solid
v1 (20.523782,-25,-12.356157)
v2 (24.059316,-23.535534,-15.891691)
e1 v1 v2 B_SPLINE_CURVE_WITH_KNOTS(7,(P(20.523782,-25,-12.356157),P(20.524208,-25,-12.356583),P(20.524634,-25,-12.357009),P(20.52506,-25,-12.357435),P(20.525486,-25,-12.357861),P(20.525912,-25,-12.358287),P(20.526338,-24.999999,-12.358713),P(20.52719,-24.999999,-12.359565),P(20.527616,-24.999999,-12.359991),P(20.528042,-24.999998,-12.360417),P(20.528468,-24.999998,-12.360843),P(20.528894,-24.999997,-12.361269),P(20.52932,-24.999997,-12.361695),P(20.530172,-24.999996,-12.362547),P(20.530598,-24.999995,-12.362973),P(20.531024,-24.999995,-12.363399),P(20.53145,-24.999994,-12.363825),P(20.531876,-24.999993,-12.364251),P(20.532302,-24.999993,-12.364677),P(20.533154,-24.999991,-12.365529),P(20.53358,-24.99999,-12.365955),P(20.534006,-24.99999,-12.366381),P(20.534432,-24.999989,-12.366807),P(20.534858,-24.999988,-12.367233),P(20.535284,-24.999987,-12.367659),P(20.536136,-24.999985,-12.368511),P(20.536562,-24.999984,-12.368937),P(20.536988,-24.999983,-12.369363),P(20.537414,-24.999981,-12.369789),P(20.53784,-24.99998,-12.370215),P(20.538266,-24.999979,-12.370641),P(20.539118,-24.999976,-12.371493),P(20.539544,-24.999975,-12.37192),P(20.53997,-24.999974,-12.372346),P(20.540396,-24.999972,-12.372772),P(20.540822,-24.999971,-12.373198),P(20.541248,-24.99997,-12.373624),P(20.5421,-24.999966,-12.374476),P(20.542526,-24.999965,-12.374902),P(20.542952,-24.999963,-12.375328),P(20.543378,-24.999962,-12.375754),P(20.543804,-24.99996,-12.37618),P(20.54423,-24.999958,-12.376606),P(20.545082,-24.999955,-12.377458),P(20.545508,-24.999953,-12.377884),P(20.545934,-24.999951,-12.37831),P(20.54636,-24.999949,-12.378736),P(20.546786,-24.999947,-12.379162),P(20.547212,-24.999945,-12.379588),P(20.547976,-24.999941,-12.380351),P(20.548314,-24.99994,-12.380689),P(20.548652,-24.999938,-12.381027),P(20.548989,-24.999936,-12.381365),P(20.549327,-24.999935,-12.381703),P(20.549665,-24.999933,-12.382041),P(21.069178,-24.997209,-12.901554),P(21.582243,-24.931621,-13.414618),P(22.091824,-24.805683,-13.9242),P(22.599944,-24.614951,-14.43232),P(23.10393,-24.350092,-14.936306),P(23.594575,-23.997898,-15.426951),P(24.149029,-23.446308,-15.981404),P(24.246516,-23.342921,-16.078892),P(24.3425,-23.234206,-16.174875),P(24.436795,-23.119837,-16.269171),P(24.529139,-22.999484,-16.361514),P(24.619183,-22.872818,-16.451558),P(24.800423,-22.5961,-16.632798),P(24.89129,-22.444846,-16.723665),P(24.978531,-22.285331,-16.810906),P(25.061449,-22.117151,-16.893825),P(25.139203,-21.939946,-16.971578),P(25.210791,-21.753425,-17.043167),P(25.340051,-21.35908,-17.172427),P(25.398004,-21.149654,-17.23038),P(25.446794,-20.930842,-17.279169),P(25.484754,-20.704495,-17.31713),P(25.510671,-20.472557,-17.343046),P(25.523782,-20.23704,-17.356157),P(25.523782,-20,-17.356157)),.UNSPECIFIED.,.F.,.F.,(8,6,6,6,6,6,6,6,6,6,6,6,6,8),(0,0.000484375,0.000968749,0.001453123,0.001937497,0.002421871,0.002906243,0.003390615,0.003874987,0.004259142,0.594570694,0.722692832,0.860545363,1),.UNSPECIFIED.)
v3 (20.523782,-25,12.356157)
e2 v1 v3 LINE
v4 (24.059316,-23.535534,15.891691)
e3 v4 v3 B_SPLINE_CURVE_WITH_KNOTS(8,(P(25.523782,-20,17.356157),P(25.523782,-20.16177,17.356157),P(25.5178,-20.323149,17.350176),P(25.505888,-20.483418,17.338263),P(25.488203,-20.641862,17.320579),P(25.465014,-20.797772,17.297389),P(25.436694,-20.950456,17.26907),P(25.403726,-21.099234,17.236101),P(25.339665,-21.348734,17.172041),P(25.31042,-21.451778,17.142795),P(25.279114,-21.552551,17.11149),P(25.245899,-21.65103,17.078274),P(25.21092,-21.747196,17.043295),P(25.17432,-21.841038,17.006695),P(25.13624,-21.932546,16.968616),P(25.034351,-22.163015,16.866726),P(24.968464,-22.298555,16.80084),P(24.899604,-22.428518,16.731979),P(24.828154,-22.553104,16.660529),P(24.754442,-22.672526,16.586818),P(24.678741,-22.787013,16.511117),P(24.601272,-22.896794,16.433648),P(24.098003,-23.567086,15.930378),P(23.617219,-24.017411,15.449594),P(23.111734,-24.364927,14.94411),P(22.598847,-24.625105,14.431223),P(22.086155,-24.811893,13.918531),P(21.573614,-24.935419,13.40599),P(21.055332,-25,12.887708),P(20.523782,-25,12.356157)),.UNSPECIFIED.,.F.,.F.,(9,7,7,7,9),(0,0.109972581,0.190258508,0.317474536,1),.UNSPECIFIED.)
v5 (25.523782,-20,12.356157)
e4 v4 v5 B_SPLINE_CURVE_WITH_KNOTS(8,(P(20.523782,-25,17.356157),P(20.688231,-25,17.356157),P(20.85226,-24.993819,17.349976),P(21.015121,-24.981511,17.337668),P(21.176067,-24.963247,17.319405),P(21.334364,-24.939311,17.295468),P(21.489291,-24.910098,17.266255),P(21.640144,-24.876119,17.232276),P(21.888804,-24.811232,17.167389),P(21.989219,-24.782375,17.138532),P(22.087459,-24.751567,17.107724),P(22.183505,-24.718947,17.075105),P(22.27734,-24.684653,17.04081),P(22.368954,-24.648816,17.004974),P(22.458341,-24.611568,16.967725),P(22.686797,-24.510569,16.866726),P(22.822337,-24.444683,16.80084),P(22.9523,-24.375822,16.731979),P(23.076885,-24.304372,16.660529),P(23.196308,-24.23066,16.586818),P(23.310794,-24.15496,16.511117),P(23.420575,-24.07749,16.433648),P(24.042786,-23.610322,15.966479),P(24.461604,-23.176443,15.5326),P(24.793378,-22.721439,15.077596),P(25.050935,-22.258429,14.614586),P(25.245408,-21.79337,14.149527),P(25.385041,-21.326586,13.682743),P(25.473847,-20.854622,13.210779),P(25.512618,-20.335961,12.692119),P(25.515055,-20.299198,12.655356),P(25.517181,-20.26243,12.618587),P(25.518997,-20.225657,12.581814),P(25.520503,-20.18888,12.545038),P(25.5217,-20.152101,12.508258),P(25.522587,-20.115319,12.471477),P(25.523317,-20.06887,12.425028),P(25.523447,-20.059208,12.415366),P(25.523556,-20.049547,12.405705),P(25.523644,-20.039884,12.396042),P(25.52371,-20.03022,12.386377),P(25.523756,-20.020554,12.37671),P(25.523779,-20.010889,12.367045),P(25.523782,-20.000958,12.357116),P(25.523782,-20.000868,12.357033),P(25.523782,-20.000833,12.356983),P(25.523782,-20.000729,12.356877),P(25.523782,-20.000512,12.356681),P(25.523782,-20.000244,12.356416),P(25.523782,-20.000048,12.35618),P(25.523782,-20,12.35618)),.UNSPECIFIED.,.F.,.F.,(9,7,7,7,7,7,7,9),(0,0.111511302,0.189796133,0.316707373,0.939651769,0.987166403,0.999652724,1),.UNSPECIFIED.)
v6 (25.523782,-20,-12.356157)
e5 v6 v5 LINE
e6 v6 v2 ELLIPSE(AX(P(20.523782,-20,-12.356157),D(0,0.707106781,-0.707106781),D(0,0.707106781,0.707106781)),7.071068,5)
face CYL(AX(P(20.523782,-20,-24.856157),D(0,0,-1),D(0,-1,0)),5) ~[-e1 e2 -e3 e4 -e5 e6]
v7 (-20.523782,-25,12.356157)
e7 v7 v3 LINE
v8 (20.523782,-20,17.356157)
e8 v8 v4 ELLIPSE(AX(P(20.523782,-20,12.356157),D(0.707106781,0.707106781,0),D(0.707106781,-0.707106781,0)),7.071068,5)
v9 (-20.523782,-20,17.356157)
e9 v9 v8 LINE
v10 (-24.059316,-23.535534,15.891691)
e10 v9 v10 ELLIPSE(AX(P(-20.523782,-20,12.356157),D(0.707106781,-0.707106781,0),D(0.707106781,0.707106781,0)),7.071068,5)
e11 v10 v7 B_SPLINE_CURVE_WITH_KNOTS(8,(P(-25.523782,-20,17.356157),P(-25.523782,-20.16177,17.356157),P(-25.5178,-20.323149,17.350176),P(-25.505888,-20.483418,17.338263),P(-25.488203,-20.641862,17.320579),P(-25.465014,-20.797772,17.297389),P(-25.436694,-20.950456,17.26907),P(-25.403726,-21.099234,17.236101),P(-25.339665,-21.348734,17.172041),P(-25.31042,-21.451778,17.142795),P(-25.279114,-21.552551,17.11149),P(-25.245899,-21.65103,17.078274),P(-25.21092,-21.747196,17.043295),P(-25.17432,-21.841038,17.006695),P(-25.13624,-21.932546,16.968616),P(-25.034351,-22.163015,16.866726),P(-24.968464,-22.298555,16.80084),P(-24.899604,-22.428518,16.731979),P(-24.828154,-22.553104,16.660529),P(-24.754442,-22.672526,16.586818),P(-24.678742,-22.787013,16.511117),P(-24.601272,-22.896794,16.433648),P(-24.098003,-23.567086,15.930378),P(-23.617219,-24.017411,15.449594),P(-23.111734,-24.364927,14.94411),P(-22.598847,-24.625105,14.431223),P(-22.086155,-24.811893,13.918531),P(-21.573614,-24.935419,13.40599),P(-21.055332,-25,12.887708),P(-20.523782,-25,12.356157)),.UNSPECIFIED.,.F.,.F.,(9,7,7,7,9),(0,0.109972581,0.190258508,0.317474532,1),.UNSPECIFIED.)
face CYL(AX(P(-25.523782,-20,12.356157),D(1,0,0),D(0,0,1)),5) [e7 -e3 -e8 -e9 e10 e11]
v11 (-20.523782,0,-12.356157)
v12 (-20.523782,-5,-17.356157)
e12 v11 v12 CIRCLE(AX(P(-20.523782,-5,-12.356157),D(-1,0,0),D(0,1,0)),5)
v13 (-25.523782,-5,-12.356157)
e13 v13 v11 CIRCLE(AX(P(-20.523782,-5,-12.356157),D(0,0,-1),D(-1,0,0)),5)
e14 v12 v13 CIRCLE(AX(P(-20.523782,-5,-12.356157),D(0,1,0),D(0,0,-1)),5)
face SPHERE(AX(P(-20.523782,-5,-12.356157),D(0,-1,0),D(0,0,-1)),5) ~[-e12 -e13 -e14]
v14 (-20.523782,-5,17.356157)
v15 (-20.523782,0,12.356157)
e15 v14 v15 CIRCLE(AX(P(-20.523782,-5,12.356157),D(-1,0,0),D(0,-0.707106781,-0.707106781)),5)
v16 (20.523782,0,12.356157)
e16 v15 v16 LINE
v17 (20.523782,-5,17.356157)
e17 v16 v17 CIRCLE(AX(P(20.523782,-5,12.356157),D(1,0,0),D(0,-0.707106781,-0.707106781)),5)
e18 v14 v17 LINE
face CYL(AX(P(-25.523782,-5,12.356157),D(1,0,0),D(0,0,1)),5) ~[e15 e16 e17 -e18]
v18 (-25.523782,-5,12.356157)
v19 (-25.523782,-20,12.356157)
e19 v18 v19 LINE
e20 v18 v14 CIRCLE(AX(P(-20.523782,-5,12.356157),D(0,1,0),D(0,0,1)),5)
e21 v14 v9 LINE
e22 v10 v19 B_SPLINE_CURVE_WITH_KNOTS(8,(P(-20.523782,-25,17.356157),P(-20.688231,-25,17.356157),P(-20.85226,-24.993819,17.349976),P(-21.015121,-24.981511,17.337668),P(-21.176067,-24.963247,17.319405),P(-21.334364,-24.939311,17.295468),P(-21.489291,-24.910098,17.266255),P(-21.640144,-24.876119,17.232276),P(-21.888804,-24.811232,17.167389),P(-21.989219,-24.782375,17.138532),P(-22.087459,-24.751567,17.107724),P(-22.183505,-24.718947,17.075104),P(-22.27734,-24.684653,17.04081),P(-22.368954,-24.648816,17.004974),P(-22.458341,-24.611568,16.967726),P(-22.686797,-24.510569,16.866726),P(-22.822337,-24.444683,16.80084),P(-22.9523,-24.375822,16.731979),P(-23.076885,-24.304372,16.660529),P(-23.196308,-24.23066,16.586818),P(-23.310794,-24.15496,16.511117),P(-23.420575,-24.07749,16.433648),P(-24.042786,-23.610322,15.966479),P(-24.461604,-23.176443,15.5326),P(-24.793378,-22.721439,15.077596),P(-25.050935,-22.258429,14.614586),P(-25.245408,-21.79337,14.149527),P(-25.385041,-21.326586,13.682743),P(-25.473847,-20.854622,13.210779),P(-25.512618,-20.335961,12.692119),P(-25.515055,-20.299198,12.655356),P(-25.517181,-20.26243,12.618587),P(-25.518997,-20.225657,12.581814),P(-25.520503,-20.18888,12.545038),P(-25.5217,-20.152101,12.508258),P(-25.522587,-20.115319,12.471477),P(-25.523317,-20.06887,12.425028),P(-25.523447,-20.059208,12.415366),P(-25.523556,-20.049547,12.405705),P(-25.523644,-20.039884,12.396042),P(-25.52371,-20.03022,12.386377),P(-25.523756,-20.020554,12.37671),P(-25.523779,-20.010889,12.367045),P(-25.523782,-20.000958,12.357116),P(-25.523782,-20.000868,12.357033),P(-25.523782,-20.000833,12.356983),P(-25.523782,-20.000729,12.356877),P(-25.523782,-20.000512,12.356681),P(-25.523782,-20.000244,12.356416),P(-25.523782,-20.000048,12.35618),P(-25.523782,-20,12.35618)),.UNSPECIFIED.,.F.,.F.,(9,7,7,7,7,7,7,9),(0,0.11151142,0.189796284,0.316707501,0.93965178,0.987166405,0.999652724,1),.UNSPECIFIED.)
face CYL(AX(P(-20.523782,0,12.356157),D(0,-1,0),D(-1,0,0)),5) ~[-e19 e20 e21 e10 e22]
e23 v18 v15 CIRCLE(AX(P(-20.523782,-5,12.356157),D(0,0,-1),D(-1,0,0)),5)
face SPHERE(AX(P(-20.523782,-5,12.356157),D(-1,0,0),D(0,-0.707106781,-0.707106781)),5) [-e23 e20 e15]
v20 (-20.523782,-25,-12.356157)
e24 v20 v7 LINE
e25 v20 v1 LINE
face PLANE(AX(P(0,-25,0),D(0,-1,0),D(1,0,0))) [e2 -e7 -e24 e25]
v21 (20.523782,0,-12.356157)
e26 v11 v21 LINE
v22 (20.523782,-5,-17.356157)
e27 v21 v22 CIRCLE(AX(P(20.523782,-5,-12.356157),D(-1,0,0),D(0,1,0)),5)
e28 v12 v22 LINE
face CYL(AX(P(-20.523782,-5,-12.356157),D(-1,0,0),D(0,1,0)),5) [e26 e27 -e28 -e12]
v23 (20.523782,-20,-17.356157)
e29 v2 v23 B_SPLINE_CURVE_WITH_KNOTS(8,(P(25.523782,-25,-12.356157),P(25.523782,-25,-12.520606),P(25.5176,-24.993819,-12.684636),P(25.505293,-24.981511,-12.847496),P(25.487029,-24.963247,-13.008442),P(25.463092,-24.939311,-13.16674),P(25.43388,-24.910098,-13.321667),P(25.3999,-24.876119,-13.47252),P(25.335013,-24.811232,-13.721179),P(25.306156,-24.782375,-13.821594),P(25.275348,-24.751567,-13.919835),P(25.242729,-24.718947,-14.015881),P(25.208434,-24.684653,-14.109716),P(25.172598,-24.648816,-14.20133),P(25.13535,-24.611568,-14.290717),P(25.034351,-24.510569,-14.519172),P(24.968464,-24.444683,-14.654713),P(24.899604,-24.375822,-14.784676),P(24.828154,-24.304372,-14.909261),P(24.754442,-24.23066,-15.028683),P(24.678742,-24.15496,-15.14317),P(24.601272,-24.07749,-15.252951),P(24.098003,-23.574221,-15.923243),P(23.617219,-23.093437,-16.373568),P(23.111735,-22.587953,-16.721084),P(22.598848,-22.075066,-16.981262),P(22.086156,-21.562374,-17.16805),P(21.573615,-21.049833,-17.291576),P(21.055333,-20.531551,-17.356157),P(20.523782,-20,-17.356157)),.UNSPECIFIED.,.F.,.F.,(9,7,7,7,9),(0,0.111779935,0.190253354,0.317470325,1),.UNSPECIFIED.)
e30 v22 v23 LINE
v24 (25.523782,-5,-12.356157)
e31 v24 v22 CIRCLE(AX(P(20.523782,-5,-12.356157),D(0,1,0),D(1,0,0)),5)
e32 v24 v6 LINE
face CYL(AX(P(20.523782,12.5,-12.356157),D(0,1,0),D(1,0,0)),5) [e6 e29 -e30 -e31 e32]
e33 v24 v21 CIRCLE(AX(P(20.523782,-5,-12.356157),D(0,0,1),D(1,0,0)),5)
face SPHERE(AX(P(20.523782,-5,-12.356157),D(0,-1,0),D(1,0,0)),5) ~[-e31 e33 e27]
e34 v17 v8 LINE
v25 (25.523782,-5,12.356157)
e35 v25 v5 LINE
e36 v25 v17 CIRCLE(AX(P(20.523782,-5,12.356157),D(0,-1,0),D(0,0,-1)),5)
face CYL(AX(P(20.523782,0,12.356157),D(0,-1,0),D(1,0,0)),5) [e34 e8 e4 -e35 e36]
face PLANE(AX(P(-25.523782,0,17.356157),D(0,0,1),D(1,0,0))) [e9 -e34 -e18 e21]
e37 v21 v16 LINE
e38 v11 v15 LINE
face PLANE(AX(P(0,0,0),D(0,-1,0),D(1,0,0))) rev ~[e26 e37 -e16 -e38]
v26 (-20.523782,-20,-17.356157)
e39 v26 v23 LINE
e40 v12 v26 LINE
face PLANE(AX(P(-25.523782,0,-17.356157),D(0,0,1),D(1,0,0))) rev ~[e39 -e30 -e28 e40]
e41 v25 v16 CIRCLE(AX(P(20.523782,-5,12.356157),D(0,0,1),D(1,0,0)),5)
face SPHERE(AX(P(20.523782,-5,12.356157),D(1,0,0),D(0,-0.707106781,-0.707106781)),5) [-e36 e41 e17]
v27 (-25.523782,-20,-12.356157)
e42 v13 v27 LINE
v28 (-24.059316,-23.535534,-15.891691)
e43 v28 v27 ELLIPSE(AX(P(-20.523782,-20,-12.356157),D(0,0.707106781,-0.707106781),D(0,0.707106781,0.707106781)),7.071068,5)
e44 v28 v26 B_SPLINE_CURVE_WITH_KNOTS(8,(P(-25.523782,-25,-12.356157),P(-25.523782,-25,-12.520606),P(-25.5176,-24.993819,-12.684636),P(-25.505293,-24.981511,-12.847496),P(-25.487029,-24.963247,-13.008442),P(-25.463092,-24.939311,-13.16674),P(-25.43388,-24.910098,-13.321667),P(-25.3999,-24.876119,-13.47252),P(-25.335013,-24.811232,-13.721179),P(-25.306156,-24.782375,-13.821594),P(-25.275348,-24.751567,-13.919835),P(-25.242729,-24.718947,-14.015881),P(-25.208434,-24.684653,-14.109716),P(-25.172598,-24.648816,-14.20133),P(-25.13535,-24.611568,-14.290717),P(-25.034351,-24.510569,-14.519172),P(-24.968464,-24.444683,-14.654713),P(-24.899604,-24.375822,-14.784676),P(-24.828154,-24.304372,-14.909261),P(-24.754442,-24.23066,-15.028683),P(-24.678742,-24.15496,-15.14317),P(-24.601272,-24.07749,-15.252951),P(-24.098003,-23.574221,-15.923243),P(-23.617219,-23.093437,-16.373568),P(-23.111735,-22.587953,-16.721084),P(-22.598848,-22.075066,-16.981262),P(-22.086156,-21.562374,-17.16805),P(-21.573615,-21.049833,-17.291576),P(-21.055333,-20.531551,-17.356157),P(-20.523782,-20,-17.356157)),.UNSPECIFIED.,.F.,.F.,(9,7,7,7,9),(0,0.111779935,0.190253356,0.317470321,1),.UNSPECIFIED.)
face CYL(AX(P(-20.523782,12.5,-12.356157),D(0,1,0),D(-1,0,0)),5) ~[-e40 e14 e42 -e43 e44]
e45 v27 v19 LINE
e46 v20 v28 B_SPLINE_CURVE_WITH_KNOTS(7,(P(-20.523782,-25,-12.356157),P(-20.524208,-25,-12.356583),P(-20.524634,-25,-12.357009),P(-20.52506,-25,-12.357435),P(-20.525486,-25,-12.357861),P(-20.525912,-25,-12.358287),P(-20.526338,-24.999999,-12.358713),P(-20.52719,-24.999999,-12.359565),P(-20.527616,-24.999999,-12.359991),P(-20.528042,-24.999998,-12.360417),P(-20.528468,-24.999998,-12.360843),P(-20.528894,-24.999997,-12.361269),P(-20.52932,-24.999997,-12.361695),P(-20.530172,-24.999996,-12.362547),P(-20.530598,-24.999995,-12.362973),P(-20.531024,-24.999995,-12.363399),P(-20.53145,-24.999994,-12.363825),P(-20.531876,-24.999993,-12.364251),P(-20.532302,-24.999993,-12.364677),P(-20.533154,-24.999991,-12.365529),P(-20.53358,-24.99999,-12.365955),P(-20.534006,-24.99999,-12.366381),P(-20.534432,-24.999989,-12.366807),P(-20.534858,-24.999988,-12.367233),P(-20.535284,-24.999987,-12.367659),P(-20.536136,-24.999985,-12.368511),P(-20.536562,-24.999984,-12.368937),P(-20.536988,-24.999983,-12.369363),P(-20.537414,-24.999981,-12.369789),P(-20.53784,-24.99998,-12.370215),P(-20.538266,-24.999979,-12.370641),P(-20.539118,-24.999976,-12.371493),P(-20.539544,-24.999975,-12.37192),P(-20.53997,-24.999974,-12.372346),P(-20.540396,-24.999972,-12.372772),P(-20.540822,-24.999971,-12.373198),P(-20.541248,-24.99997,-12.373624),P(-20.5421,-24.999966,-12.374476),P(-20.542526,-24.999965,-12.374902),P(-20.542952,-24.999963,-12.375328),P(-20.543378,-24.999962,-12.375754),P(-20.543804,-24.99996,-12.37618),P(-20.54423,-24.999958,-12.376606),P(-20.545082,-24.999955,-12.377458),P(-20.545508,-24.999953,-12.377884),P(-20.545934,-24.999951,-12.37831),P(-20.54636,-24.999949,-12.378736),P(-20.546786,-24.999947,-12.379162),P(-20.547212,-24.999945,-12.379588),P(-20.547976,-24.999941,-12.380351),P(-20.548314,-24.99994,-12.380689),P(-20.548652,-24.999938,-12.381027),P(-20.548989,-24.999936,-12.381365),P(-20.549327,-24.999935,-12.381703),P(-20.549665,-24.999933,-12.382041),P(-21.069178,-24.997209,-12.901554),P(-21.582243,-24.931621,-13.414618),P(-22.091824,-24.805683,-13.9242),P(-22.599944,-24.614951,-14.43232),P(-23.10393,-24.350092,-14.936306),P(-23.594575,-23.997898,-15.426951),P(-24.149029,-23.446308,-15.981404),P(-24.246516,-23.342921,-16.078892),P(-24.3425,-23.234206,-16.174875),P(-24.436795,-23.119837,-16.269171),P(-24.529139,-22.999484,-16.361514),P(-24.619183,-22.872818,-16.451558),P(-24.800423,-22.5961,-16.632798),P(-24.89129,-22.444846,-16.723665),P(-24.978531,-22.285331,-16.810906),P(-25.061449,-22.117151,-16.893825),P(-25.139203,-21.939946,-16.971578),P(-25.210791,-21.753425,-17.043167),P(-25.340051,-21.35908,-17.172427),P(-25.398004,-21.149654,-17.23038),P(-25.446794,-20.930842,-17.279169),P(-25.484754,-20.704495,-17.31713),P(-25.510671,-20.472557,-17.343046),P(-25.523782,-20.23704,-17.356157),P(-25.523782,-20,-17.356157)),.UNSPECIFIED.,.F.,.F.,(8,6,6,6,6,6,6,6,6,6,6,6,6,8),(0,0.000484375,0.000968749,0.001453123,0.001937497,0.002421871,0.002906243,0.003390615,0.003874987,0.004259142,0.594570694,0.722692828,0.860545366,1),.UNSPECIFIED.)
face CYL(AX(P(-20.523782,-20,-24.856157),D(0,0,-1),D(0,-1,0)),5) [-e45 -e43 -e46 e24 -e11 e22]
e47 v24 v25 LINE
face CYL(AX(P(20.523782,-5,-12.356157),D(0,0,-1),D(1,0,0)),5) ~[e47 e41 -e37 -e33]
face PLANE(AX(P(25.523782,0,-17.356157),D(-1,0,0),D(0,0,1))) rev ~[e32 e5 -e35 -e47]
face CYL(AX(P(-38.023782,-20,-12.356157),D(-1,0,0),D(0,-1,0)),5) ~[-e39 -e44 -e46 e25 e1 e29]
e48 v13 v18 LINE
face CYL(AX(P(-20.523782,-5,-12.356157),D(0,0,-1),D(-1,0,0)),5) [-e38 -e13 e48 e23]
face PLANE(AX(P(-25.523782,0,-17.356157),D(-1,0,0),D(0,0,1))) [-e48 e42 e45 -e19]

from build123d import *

# Parameters (mm, degrees)
F0_W         = 51.0475635529
F0_H         = 34.7123146057
F1_DEPTH     = 25
F2_R         = 5
F3_T1_DEPTH  = 50
F3_T3_DEPTH  = 76.0475635529
F4_T1_DEPTH  = 41.0475635528
F4_T3_DEPTH  = 24.7123146058
F4_S7_W      = 5
F4_S7_H      = 5
F4_T8_DEPTH  = 5
F4_S13_W     = 5
F4_S13_H     = 5
F4_T14_DEPTH = 5
F4_T18_ANGLE = 90.0000000014
F4_T20_ANGLE = 90.0000000014
F5_T1_DEPTH  = 49.7123146058


# Not quite as in the source:
# - a fillet or chamfer that OpenCascade refuses, or shapes differently, is made with other operations: its cross-section is extruded or revolved along the edge and cut away or added


with BuildPart() as f1:
    # F0 (on Front) → F1 (new body)
    with BuildSketch(Plane.XZ):
        Rectangle(F0_W, F0_H)
    extrude(amount=F1_DEPTH)

    # F2
    f2_edges = [f1.edges().sort_by_distance(p)[0] for p in [
        (0, -25, 17.356157),
        (0, 0, 17.356157),
        (-25.523782, -12.5, 17.356157),
        (25.523782, -12.5, 17.356157),
    ]]
    fillet(f2_edges, radius=F2_R)

    # F3: fillet of radius 5 on 4 edges, made by hand

    # F3_s2 → F3_t1 (cut)
    with BuildSketch(Plane.XZ.offset(-12.5)):
        with BuildLine():
            ThreePointArc((-25.5237817764, -12.3561573029), (-24.0593156824, -15.8916912088), (-20.5237817764, -17.3561573029))
            Line((-20.5237817764, -17.3561573029), (-25.5237817764, -17.3561573029))
            Line((-25.5237817764, -17.3561573029), (-25.5237817764, -12.3561573029))
        make_face()
        with BuildLine():
            ThreePointArc((25.5237817764, -12.3561573029), (24.0593156824, -15.8916912088), (20.5237817764, -17.3561573029))
            Line((20.5237817764, -17.3561573029), (25.5237817764, -17.3561573029))
            Line((25.5237817764, -17.3561573029), (25.5237817764, -12.3561573029))
        make_face()
    extrude(amount=F3_T1_DEPTH, mode=Mode.SUBTRACT)

    # F3_s4 → F3_t3 (cut)
    with BuildSketch(Plane.YZ.offset(-38.0237817764)):
        with BuildLine():
            ThreePointArc((-25, -12.3561573029), (-23.5355339059, -15.8916912088), (-20, -17.3561573029))
            Line((-20, -17.3561573029), (-25, -17.3561573029))
            Line((-25, -17.3561573029), (-25, -12.3561573029))
        make_face()
    extrude(amount=F3_T3_DEPTH, mode=Mode.SUBTRACT)

    # F4: fillet of radius 5 on 3 edges, made by hand

    # F4_s2 → F4_t1 (cut)
    with BuildSketch(Plane.YZ.offset(-20.5237817764)):
        with BuildLine():
            ThreePointArc((0, -12.3561573029), (-1.4644660941, -15.8916912088), (-5, -17.3561573029))
            Line((-5, -17.3561573029), (0, -17.3561573029))
            Line((0, -17.3561573029), (0, -12.3561573029))
        make_face()
    extrude(amount=F4_T1_DEPTH, mode=Mode.SUBTRACT)

    # F4_s4 → F4_t3 (cut)
    with BuildSketch(Plane.XY.offset(-12.3561573029)):
        with BuildLine():
            ThreePointArc((25.5237817764, -5), (24.0593156824, -1.4644660941), (20.5237817764, 0))
            Line((20.5237817764, 0), (25.5237817764, 0))
            Line((25.5237817764, 0), (25.5237817764, -5))
        make_face()
        with BuildLine():
            ThreePointArc((-25.5237817764, -5), (-24.0593156824, -1.4644660941), (-20.5237817764, 0))
            Line((-20.5237817764, 0), (-25.5237817764, 0))
            Line((-25.5237817764, 0), (-25.5237817764, -5))
        make_face()
    extrude(amount=F4_T3_DEPTH, mode=Mode.SUBTRACT)


with BuildPart() as f4_tool6:
    # F4_s7 → F4_t8 (new body)
    with BuildSketch(Plane.YZ.offset(20.5237817764)):
        with Locations((-2.5, 14.8561573029)):
            Rectangle(F4_S7_W, F4_S7_H)
    extrude(amount=F4_T8_DEPTH)

    # F4_s9 → F4_t10 (revolve, cut)
    with BuildSketch(Plane(origin=(20.5237817764, -5, 12.3561573029), x_dir=(0, -0.7071067812, -0.7071067812), z_dir=(0, -0.7071067812, 0.7071067812))):
        with BuildLine():
            ThreePointArc((0, -5), (5, 0), (0, 5))
            Line((0, 5), (0, -5))
        make_face()
    revolve(axis=Axis((20.5237817764, -5, 12.3561573029), (1, 0, 0)), mode=Mode.SUBTRACT)


with BuildPart() as f1_1:
    add(f1.part)

    # F4_t5: cut F4_tool6
    add(f4_tool6.part, mode=Mode.SUBTRACT)


with BuildPart() as f4_tool12:
    # F4_s13 → F4_t14 (new body)
    with BuildSketch(Plane.YZ.offset(-20.5237817764)):
        with Locations((-2.5, 14.8561573029)):
            Rectangle(F4_S13_W, F4_S13_H)
    extrude(amount=-F4_T14_DEPTH)

    # F4_s15 → F4_t16 (revolve, cut)
    with BuildSketch(Plane(origin=(-20.5237817764, -5, 12.3561573029), x_dir=(0, -0.7071067812, -0.7071067812), z_dir=(0, 0.7071067812, -0.7071067812))):
        with BuildLine():
            ThreePointArc((0, -5), (5, 0), (0, 5))
            Line((0, 5), (0, -5))
        make_face()
    revolve(axis=Axis((-20.5237817764, -5, 12.3561573029), (-1, 0, 0)), mode=Mode.SUBTRACT)


with BuildPart() as f1_2:
    add(f1_1.part)

    # F4_t11: cut F4_tool12
    add(f4_tool12.part, mode=Mode.SUBTRACT)

    # F4_s17 → F4_t18 (revolve, cut)
    with BuildSketch(Plane.YZ.offset(-20.5237817765)):
        with BuildLine():
            ThreePointArc((0, -12.3561573029), (-1.4644660941, -15.8916912088), (-5, -17.3561573029))
            Line((-5, -17.3561573029), (0, -17.3561573029))
            Line((0, -17.3561573029), (0, -12.3561573029))
        make_face()
    revolve(axis=Axis((-20.5237817765, 0, -12.356157303), (0, 1, 0)), revolution_arc=F4_T18_ANGLE, mode=Mode.SUBTRACT)

    # F4_s19 → F4_t20 (revolve, cut)
    with BuildSketch(Plane.XY.offset(-12.356157303)):
        with BuildLine():
            ThreePointArc((20.5237817764, 0), (24.0593156823, -1.4644660941), (25.5237817764, -5))
            Line((25.5237817764, -5), (25.5237817764, 0))
            Line((25.5237817764, 0), (20.5237817764, 0))
        make_face()
    revolve(axis=Axis((20.5237817765, 0, -12.356157303), (0, 1, 0)), revolution_arc=F4_T20_ANGLE, mode=Mode.SUBTRACT)

    # F5: fillet of radius 5 on 4 edges, made by hand

    # F5_s2 → F5_t1 (cut)
    with BuildSketch(Plane.XY.offset(-24.8561573029)):
        with BuildLine():
            ThreePointArc((20.5237817764, -25), (24.0593156824, -23.5355339059), (25.5237817764, -20))
            Line((25.5237817764, -20), (25.5237817764, -25))
            Line((25.5237817764, -25), (20.5237817764, -25))
        make_face()
        with BuildLine():
            ThreePointArc((-20.5237817764, -25), (-24.0593156824, -23.5355339059), (-25.5237817764, -20))
            Line((-25.5237817764, -20), (-25.5237817764, -25))
            Line((-25.5237817764, -25), (-20.5237817764, -25))
        make_face()
    extrude(amount=F5_T1_DEPTH, mode=Mode.SUBTRACT)


solid = f1_2.part
